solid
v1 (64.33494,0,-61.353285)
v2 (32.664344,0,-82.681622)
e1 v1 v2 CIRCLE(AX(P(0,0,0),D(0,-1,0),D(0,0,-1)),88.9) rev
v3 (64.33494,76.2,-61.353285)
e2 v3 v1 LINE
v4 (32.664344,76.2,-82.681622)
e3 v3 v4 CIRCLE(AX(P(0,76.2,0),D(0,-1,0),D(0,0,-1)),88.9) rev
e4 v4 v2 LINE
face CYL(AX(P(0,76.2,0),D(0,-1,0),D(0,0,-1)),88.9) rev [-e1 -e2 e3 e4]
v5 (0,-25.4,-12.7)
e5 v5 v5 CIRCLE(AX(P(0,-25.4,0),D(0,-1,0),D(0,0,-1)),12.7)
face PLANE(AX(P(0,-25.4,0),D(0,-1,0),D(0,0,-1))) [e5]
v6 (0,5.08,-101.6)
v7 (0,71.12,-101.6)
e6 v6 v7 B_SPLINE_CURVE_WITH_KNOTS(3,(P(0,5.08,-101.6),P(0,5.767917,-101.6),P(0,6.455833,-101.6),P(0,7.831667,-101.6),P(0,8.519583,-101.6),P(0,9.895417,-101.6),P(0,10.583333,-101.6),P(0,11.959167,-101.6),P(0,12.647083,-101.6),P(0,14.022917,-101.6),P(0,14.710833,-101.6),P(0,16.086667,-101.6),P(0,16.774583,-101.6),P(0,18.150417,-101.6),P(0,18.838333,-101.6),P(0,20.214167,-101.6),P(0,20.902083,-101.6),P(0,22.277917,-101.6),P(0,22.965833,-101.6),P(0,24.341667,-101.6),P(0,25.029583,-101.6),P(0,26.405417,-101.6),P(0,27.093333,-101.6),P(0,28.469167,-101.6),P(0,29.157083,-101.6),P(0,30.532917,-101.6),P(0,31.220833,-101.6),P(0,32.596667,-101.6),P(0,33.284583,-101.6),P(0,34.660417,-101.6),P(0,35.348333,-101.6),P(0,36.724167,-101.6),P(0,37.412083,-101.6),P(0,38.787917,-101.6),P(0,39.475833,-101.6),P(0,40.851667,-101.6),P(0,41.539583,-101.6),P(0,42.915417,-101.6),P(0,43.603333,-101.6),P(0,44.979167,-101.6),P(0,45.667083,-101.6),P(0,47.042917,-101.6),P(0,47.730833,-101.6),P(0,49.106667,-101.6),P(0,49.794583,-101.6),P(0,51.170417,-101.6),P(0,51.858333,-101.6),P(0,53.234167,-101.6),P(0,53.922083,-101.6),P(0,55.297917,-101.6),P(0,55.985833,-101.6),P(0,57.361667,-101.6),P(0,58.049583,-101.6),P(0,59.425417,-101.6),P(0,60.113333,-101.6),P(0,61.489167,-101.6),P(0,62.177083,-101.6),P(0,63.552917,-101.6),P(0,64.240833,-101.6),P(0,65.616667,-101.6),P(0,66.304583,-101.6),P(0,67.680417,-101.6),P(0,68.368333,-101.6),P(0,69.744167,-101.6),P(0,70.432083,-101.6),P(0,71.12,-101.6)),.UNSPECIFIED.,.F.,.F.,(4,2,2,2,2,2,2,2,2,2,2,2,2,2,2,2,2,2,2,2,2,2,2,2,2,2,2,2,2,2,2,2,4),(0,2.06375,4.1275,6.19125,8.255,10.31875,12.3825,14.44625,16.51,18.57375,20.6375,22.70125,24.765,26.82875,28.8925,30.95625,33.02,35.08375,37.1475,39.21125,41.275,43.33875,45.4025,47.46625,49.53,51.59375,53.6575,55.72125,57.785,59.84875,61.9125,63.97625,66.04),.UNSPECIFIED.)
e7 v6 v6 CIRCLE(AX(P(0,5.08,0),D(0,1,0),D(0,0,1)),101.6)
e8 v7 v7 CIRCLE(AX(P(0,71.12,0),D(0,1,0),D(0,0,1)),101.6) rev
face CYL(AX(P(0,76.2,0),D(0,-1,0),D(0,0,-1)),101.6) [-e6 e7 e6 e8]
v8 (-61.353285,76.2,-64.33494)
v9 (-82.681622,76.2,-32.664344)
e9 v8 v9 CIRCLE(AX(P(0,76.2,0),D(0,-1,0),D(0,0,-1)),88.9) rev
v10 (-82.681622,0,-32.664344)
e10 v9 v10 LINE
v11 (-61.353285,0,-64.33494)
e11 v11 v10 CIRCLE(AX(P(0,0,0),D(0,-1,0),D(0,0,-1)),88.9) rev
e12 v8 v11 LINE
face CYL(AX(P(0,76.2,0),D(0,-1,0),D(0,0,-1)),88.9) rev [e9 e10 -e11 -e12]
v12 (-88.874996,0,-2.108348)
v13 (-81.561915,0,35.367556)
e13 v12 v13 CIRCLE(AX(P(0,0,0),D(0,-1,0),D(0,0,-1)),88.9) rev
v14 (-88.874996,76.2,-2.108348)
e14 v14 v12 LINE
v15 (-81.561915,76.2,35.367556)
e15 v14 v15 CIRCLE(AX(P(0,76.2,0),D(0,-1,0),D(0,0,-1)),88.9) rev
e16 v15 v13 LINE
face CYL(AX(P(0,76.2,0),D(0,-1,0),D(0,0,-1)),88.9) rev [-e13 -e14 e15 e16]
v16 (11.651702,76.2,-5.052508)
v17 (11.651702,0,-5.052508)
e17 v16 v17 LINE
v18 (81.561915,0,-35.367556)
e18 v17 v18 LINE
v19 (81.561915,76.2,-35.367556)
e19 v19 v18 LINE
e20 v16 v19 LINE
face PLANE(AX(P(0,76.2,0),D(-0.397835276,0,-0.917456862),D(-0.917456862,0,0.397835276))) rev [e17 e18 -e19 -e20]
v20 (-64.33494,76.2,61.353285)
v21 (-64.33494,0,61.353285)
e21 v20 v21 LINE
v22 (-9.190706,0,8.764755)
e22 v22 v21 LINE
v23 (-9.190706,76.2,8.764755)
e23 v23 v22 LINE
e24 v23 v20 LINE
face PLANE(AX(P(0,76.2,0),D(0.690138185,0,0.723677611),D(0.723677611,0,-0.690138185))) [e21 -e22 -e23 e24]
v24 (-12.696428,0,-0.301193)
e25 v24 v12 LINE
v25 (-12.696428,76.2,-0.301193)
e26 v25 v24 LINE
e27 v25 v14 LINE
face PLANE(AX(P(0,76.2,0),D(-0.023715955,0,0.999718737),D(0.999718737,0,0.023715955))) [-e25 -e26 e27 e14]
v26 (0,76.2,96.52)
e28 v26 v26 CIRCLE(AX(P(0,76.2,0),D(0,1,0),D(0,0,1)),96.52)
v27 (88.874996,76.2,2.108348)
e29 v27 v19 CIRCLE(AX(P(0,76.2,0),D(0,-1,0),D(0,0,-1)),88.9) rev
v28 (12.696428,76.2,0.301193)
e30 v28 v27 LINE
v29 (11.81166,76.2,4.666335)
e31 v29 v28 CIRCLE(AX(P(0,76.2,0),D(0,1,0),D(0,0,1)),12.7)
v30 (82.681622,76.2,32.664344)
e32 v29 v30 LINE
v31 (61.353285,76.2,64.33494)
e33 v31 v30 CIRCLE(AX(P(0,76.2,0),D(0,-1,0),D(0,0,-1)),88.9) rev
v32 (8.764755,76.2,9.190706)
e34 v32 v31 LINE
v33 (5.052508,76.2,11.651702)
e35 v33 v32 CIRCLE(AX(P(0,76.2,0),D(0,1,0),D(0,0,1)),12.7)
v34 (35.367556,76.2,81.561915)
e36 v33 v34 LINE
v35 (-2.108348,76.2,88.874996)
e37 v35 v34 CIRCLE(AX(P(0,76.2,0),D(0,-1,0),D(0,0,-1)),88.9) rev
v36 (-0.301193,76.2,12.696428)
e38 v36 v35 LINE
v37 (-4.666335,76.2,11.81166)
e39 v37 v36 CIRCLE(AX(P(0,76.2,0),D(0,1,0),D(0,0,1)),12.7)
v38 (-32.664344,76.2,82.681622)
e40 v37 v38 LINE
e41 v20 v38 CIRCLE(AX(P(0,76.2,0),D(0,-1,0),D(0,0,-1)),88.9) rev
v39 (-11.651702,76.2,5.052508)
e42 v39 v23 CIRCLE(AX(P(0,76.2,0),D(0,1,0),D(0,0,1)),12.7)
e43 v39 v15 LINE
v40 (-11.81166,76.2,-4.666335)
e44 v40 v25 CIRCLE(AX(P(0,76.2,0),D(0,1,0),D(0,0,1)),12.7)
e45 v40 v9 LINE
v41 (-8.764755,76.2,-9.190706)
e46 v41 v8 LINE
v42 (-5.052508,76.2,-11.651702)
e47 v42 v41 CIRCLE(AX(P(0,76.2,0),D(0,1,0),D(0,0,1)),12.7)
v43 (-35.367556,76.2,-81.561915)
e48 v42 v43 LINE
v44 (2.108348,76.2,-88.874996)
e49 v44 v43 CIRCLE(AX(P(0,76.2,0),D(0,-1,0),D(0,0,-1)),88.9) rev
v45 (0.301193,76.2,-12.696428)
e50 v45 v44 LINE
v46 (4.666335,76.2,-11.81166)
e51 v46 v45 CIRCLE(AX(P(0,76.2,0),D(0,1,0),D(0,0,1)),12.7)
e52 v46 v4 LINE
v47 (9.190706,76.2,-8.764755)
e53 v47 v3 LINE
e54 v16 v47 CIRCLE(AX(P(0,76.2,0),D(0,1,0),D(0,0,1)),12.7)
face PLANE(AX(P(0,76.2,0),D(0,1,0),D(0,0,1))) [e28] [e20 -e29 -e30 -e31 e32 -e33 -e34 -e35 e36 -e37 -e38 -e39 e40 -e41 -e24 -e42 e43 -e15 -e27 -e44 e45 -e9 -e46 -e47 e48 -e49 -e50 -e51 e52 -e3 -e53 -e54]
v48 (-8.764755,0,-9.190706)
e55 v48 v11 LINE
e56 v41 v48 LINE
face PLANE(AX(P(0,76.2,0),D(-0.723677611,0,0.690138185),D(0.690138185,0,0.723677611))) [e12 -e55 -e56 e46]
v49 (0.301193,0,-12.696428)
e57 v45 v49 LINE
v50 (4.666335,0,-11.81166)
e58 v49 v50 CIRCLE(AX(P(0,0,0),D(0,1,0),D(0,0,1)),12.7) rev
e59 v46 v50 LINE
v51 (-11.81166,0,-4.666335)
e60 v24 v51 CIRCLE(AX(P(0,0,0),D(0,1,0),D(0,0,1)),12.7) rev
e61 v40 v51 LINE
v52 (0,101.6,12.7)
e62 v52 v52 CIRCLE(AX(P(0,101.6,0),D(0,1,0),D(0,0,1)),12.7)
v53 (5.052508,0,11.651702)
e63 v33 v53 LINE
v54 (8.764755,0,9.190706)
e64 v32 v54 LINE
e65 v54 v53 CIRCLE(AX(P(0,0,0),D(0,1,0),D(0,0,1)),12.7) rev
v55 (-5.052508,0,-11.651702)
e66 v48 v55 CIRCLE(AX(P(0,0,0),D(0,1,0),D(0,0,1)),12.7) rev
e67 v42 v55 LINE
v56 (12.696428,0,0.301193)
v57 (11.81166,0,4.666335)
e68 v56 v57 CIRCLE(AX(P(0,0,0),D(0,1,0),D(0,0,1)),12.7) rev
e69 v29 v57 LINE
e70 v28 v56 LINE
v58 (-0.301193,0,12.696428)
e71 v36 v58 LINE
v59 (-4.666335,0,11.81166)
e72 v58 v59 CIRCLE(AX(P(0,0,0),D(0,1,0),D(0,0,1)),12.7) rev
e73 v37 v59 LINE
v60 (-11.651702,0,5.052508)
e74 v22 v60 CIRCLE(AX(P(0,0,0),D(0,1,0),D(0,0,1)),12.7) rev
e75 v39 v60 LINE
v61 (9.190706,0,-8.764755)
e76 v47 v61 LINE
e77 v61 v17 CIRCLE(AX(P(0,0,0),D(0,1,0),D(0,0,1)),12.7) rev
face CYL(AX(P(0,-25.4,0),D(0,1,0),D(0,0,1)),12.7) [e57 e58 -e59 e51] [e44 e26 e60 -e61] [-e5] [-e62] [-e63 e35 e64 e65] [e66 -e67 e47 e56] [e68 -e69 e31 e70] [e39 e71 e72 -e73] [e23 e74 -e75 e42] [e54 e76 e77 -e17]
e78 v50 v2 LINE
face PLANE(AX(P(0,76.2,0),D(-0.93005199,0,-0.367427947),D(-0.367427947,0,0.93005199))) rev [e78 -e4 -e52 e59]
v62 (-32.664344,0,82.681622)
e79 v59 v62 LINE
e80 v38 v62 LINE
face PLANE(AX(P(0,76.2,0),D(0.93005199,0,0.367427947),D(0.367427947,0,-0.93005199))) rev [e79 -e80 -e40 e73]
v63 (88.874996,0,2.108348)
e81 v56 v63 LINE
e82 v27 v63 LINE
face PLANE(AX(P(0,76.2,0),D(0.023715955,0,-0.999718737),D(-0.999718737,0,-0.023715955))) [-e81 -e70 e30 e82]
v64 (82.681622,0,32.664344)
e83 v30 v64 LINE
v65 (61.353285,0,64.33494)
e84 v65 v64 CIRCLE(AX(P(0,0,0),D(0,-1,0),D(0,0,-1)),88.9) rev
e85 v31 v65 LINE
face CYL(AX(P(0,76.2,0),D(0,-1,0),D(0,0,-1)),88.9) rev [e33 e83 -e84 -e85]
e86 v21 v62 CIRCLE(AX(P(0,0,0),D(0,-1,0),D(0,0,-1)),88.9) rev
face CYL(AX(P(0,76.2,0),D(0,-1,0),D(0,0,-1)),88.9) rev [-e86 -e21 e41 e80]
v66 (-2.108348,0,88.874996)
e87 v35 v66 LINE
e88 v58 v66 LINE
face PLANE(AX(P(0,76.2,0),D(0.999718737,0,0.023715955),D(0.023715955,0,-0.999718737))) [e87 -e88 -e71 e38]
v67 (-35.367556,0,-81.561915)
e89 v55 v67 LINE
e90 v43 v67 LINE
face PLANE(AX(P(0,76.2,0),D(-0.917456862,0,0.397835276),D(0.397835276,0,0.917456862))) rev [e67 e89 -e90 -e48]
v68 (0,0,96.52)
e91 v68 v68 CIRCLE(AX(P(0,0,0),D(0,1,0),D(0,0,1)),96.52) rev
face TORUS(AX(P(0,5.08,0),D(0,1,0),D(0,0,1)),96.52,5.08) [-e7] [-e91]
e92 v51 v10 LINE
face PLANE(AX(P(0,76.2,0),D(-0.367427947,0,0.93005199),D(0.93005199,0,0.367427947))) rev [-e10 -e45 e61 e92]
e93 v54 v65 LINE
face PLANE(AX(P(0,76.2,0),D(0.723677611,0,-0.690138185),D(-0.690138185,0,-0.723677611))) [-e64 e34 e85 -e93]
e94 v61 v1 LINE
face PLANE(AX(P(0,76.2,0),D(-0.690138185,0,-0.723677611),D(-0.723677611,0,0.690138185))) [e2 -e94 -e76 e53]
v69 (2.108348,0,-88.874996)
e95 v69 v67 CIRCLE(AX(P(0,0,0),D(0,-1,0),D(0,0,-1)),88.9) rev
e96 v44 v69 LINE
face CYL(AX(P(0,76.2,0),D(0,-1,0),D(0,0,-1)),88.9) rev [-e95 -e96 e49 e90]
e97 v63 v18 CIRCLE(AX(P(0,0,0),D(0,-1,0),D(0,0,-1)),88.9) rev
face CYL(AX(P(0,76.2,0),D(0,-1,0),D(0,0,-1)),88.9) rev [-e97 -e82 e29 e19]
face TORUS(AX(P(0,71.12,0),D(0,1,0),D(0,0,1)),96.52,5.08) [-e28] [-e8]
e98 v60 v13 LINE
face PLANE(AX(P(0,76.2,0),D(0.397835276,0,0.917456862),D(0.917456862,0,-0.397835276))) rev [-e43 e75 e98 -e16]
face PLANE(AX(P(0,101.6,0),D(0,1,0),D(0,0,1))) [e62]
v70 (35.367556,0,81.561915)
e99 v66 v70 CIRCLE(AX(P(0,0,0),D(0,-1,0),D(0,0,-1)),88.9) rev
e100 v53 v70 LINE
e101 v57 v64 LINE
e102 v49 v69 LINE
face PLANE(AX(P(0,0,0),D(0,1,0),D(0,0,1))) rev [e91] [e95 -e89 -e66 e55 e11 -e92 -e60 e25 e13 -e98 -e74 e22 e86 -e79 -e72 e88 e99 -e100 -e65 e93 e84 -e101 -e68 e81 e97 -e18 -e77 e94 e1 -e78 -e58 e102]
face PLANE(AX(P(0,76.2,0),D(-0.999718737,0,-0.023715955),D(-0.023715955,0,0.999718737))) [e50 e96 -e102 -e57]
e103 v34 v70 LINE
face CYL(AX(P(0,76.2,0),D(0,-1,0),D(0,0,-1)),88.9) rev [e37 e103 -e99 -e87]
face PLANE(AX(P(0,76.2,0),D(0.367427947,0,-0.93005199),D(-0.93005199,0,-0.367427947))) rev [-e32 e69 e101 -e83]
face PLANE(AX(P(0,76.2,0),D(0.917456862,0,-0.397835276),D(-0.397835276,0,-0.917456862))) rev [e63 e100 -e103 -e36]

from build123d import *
from build123d.topology import SkipClean

# Parameters (mm, degrees)
SKETCH2_R           = 101.6
BOSS_EXTRUDE1_DEPTH = 76.2
SKETCH4_R           = 12.7
BOSS_EXTRUDE4_DEPTH = 25.4
FILLET1_R           = 5.08
FILLET2_R           = 5.08
CUT_EXTRUDE2_START  = -76.2
CUT_EXTRUDE2_DEPTH  = 76.2
BOSS_EXTRUDE5_START = 25.4
SKETCH8_R           = 12.7
BOSS_EXTRUDE5_DEPTH = 25.4


with BuildPart() as part:
    # Sketch2 → Boss-Extrude1 (new body)
    with BuildSketch(Plane(origin=(0, 0, 0), x_dir=(1, 0, 0), z_dir=(0, 1, 0))):
        Circle(SKETCH2_R)
    extrude(amount=BOSS_EXTRUDE1_DEPTH)

    # Sketch4 → Boss-Extrude4 (add)
    with BuildSketch(Plane(origin=(0, 0, 0), x_dir=(-1, 0, 0), z_dir=(0, -1, 0))):
        Circle(SKETCH4_R)
    extrude(amount=BOSS_EXTRUDE4_DEPTH)

    # Fillet1
    fillet1_edges = [part.edges().sort_by_distance(p)[0] for p in [
        (-101.6, 76.2, 0),
    ]]
    fillet(fillet1_edges, radius=FILLET1_R)

    # Fillet2
    fillet2_edges = [part.edges().sort_by_distance(p)[0] for p in [
        (-101.6, 0, 0),
    ]]
    fillet(fillet2_edges, radius=FILLET2_R)

    # Sketch7 → Cut-Extrude2 (cut)
    with SkipClean():  # the faces are left unmerged after this step: merging them gives an invalid solid
        with BuildSketch(Plane.XZ.offset(CUT_EXTRUDE2_START)):
            with BuildLine():
                ThreePointArc((12.696427962, 0.301192634), (12.464886183, -2.432408777), (11.651702143, -5.052508009))
                Line((11.651702143, -5.052508009), (81.561914999, -35.367556061))
                ThreePointArc((81.561914999, -35.367556061), (87.254203278, -17.026861437), (88.874995735, 2.108348439))
                Line((88.874995735, 2.108348439), (12.696427962, 0.301192634))
            make_face()
            with BuildLine():
                Line((64.33493964, -61.353284684), (9.190705663, -8.764754955))
                ThreePointArc((9.190705663, -8.764754955), (7.094032806, -10.533978287), (4.666334922, -11.811660272))
                Line((4.666334922, -11.811660272), (32.664344457, -82.681621907))
                ThreePointArc((32.664344457, -82.681621907), (49.658229641, -73.737848009), (64.33493964, -61.353284684))
            make_face()
            with BuildLine():
                Line((2.108348439, -88.874995735), (0.301192634, -12.696427962))
                ThreePointArc((0.301192634, -12.696427962), (-2.432408777, -12.464886183), (-5.052508009, -11.651702143))
                Line((-5.052508009, -11.651702143), (-35.367556061, -81.561914999))
                ThreePointArc((-35.367556061, -81.561914999), (-17.026861437, -87.254203278), (2.108348439, -88.874995735))
            make_face()
            with BuildLine():
                Line((-61.353284684, -64.33493964), (-8.764754955, -9.190705663))
                ThreePointArc((-8.764754955, -9.190705663), (-10.533978287, -7.094032806), (-11.811660272, -4.666334922))
                Line((-11.811660272, -4.666334922), (-82.681621907, -32.664344457))
                ThreePointArc((-82.681621907, -32.664344457), (-73.737848009, -49.658229641), (-61.353284684, -64.33493964))
            make_face()
            with BuildLine():
                Line((-88.874995735, -2.108348439), (-12.696427962, -0.301192634))
                ThreePointArc((-12.696427962, -0.301192634), (-12.464886183, 2.432408777), (-11.651702143, 5.052508009))
                Line((-11.651702143, 5.052508009), (-81.561914999, 35.367556061))
                ThreePointArc((-81.561914999, 35.367556061), (-87.254203278, 17.026861437), (-88.874995735, -2.108348439))
            make_face()
            with BuildLine():
                Line((-64.33493964, 61.353284684), (-9.190705663, 8.764754955))
                ThreePointArc((-9.190705663, 8.764754955), (-7.094032806, 10.533978287), (-4.666334922, 11.811660272))
                Line((-4.666334922, 11.811660272), (-32.664344457, 82.681621907))
                ThreePointArc((-32.664344457, 82.681621907), (-49.658229641, 73.737848009), (-64.33493964, 61.353284684))
            make_face()
            with BuildLine():
                Line((-2.108348439, 88.874995735), (-0.301192634, 12.696427962))
                ThreePointArc((-0.301192634, 12.696427962), (2.432408777, 12.464886183), (5.052508009, 11.651702143))
                Line((5.052508009, 11.651702143), (35.367556061, 81.561914999))
                ThreePointArc((35.367556061, 81.561914999), (17.026861437, 87.254203278), (-2.108348439, 88.874995735))
            make_face()
            with BuildLine():
                Line((61.353284684, 64.33493964), (8.764754955, 9.190705663))
                ThreePointArc((8.764754955, 9.190705663), (10.533978287, 7.094032806), (11.811660272, 4.666334922))
                Line((11.811660272, 4.666334922), (82.681621907, 32.664344457))
                ThreePointArc((82.681621907, 32.664344457), (73.737848009, 49.658229641), (61.353284684, 64.33493964))
            make_face()
        extrude(amount=CUT_EXTRUDE2_DEPTH, mode=Mode.SUBTRACT)

    # Sketch8 → Boss-Extrude5 (add)
    with SkipClean():  # the faces are left unmerged after this step: merging them gives an invalid solid
        with BuildSketch(Plane(origin=(0, 76.2, 0), x_dir=(1, 0, 0), z_dir=(0, 1, 0)).offset(BOSS_EXTRUDE5_START)):
            Circle(SKETCH8_R)
        extrude(amount=-BOSS_EXTRUDE5_DEPTH)


solid = part.part
